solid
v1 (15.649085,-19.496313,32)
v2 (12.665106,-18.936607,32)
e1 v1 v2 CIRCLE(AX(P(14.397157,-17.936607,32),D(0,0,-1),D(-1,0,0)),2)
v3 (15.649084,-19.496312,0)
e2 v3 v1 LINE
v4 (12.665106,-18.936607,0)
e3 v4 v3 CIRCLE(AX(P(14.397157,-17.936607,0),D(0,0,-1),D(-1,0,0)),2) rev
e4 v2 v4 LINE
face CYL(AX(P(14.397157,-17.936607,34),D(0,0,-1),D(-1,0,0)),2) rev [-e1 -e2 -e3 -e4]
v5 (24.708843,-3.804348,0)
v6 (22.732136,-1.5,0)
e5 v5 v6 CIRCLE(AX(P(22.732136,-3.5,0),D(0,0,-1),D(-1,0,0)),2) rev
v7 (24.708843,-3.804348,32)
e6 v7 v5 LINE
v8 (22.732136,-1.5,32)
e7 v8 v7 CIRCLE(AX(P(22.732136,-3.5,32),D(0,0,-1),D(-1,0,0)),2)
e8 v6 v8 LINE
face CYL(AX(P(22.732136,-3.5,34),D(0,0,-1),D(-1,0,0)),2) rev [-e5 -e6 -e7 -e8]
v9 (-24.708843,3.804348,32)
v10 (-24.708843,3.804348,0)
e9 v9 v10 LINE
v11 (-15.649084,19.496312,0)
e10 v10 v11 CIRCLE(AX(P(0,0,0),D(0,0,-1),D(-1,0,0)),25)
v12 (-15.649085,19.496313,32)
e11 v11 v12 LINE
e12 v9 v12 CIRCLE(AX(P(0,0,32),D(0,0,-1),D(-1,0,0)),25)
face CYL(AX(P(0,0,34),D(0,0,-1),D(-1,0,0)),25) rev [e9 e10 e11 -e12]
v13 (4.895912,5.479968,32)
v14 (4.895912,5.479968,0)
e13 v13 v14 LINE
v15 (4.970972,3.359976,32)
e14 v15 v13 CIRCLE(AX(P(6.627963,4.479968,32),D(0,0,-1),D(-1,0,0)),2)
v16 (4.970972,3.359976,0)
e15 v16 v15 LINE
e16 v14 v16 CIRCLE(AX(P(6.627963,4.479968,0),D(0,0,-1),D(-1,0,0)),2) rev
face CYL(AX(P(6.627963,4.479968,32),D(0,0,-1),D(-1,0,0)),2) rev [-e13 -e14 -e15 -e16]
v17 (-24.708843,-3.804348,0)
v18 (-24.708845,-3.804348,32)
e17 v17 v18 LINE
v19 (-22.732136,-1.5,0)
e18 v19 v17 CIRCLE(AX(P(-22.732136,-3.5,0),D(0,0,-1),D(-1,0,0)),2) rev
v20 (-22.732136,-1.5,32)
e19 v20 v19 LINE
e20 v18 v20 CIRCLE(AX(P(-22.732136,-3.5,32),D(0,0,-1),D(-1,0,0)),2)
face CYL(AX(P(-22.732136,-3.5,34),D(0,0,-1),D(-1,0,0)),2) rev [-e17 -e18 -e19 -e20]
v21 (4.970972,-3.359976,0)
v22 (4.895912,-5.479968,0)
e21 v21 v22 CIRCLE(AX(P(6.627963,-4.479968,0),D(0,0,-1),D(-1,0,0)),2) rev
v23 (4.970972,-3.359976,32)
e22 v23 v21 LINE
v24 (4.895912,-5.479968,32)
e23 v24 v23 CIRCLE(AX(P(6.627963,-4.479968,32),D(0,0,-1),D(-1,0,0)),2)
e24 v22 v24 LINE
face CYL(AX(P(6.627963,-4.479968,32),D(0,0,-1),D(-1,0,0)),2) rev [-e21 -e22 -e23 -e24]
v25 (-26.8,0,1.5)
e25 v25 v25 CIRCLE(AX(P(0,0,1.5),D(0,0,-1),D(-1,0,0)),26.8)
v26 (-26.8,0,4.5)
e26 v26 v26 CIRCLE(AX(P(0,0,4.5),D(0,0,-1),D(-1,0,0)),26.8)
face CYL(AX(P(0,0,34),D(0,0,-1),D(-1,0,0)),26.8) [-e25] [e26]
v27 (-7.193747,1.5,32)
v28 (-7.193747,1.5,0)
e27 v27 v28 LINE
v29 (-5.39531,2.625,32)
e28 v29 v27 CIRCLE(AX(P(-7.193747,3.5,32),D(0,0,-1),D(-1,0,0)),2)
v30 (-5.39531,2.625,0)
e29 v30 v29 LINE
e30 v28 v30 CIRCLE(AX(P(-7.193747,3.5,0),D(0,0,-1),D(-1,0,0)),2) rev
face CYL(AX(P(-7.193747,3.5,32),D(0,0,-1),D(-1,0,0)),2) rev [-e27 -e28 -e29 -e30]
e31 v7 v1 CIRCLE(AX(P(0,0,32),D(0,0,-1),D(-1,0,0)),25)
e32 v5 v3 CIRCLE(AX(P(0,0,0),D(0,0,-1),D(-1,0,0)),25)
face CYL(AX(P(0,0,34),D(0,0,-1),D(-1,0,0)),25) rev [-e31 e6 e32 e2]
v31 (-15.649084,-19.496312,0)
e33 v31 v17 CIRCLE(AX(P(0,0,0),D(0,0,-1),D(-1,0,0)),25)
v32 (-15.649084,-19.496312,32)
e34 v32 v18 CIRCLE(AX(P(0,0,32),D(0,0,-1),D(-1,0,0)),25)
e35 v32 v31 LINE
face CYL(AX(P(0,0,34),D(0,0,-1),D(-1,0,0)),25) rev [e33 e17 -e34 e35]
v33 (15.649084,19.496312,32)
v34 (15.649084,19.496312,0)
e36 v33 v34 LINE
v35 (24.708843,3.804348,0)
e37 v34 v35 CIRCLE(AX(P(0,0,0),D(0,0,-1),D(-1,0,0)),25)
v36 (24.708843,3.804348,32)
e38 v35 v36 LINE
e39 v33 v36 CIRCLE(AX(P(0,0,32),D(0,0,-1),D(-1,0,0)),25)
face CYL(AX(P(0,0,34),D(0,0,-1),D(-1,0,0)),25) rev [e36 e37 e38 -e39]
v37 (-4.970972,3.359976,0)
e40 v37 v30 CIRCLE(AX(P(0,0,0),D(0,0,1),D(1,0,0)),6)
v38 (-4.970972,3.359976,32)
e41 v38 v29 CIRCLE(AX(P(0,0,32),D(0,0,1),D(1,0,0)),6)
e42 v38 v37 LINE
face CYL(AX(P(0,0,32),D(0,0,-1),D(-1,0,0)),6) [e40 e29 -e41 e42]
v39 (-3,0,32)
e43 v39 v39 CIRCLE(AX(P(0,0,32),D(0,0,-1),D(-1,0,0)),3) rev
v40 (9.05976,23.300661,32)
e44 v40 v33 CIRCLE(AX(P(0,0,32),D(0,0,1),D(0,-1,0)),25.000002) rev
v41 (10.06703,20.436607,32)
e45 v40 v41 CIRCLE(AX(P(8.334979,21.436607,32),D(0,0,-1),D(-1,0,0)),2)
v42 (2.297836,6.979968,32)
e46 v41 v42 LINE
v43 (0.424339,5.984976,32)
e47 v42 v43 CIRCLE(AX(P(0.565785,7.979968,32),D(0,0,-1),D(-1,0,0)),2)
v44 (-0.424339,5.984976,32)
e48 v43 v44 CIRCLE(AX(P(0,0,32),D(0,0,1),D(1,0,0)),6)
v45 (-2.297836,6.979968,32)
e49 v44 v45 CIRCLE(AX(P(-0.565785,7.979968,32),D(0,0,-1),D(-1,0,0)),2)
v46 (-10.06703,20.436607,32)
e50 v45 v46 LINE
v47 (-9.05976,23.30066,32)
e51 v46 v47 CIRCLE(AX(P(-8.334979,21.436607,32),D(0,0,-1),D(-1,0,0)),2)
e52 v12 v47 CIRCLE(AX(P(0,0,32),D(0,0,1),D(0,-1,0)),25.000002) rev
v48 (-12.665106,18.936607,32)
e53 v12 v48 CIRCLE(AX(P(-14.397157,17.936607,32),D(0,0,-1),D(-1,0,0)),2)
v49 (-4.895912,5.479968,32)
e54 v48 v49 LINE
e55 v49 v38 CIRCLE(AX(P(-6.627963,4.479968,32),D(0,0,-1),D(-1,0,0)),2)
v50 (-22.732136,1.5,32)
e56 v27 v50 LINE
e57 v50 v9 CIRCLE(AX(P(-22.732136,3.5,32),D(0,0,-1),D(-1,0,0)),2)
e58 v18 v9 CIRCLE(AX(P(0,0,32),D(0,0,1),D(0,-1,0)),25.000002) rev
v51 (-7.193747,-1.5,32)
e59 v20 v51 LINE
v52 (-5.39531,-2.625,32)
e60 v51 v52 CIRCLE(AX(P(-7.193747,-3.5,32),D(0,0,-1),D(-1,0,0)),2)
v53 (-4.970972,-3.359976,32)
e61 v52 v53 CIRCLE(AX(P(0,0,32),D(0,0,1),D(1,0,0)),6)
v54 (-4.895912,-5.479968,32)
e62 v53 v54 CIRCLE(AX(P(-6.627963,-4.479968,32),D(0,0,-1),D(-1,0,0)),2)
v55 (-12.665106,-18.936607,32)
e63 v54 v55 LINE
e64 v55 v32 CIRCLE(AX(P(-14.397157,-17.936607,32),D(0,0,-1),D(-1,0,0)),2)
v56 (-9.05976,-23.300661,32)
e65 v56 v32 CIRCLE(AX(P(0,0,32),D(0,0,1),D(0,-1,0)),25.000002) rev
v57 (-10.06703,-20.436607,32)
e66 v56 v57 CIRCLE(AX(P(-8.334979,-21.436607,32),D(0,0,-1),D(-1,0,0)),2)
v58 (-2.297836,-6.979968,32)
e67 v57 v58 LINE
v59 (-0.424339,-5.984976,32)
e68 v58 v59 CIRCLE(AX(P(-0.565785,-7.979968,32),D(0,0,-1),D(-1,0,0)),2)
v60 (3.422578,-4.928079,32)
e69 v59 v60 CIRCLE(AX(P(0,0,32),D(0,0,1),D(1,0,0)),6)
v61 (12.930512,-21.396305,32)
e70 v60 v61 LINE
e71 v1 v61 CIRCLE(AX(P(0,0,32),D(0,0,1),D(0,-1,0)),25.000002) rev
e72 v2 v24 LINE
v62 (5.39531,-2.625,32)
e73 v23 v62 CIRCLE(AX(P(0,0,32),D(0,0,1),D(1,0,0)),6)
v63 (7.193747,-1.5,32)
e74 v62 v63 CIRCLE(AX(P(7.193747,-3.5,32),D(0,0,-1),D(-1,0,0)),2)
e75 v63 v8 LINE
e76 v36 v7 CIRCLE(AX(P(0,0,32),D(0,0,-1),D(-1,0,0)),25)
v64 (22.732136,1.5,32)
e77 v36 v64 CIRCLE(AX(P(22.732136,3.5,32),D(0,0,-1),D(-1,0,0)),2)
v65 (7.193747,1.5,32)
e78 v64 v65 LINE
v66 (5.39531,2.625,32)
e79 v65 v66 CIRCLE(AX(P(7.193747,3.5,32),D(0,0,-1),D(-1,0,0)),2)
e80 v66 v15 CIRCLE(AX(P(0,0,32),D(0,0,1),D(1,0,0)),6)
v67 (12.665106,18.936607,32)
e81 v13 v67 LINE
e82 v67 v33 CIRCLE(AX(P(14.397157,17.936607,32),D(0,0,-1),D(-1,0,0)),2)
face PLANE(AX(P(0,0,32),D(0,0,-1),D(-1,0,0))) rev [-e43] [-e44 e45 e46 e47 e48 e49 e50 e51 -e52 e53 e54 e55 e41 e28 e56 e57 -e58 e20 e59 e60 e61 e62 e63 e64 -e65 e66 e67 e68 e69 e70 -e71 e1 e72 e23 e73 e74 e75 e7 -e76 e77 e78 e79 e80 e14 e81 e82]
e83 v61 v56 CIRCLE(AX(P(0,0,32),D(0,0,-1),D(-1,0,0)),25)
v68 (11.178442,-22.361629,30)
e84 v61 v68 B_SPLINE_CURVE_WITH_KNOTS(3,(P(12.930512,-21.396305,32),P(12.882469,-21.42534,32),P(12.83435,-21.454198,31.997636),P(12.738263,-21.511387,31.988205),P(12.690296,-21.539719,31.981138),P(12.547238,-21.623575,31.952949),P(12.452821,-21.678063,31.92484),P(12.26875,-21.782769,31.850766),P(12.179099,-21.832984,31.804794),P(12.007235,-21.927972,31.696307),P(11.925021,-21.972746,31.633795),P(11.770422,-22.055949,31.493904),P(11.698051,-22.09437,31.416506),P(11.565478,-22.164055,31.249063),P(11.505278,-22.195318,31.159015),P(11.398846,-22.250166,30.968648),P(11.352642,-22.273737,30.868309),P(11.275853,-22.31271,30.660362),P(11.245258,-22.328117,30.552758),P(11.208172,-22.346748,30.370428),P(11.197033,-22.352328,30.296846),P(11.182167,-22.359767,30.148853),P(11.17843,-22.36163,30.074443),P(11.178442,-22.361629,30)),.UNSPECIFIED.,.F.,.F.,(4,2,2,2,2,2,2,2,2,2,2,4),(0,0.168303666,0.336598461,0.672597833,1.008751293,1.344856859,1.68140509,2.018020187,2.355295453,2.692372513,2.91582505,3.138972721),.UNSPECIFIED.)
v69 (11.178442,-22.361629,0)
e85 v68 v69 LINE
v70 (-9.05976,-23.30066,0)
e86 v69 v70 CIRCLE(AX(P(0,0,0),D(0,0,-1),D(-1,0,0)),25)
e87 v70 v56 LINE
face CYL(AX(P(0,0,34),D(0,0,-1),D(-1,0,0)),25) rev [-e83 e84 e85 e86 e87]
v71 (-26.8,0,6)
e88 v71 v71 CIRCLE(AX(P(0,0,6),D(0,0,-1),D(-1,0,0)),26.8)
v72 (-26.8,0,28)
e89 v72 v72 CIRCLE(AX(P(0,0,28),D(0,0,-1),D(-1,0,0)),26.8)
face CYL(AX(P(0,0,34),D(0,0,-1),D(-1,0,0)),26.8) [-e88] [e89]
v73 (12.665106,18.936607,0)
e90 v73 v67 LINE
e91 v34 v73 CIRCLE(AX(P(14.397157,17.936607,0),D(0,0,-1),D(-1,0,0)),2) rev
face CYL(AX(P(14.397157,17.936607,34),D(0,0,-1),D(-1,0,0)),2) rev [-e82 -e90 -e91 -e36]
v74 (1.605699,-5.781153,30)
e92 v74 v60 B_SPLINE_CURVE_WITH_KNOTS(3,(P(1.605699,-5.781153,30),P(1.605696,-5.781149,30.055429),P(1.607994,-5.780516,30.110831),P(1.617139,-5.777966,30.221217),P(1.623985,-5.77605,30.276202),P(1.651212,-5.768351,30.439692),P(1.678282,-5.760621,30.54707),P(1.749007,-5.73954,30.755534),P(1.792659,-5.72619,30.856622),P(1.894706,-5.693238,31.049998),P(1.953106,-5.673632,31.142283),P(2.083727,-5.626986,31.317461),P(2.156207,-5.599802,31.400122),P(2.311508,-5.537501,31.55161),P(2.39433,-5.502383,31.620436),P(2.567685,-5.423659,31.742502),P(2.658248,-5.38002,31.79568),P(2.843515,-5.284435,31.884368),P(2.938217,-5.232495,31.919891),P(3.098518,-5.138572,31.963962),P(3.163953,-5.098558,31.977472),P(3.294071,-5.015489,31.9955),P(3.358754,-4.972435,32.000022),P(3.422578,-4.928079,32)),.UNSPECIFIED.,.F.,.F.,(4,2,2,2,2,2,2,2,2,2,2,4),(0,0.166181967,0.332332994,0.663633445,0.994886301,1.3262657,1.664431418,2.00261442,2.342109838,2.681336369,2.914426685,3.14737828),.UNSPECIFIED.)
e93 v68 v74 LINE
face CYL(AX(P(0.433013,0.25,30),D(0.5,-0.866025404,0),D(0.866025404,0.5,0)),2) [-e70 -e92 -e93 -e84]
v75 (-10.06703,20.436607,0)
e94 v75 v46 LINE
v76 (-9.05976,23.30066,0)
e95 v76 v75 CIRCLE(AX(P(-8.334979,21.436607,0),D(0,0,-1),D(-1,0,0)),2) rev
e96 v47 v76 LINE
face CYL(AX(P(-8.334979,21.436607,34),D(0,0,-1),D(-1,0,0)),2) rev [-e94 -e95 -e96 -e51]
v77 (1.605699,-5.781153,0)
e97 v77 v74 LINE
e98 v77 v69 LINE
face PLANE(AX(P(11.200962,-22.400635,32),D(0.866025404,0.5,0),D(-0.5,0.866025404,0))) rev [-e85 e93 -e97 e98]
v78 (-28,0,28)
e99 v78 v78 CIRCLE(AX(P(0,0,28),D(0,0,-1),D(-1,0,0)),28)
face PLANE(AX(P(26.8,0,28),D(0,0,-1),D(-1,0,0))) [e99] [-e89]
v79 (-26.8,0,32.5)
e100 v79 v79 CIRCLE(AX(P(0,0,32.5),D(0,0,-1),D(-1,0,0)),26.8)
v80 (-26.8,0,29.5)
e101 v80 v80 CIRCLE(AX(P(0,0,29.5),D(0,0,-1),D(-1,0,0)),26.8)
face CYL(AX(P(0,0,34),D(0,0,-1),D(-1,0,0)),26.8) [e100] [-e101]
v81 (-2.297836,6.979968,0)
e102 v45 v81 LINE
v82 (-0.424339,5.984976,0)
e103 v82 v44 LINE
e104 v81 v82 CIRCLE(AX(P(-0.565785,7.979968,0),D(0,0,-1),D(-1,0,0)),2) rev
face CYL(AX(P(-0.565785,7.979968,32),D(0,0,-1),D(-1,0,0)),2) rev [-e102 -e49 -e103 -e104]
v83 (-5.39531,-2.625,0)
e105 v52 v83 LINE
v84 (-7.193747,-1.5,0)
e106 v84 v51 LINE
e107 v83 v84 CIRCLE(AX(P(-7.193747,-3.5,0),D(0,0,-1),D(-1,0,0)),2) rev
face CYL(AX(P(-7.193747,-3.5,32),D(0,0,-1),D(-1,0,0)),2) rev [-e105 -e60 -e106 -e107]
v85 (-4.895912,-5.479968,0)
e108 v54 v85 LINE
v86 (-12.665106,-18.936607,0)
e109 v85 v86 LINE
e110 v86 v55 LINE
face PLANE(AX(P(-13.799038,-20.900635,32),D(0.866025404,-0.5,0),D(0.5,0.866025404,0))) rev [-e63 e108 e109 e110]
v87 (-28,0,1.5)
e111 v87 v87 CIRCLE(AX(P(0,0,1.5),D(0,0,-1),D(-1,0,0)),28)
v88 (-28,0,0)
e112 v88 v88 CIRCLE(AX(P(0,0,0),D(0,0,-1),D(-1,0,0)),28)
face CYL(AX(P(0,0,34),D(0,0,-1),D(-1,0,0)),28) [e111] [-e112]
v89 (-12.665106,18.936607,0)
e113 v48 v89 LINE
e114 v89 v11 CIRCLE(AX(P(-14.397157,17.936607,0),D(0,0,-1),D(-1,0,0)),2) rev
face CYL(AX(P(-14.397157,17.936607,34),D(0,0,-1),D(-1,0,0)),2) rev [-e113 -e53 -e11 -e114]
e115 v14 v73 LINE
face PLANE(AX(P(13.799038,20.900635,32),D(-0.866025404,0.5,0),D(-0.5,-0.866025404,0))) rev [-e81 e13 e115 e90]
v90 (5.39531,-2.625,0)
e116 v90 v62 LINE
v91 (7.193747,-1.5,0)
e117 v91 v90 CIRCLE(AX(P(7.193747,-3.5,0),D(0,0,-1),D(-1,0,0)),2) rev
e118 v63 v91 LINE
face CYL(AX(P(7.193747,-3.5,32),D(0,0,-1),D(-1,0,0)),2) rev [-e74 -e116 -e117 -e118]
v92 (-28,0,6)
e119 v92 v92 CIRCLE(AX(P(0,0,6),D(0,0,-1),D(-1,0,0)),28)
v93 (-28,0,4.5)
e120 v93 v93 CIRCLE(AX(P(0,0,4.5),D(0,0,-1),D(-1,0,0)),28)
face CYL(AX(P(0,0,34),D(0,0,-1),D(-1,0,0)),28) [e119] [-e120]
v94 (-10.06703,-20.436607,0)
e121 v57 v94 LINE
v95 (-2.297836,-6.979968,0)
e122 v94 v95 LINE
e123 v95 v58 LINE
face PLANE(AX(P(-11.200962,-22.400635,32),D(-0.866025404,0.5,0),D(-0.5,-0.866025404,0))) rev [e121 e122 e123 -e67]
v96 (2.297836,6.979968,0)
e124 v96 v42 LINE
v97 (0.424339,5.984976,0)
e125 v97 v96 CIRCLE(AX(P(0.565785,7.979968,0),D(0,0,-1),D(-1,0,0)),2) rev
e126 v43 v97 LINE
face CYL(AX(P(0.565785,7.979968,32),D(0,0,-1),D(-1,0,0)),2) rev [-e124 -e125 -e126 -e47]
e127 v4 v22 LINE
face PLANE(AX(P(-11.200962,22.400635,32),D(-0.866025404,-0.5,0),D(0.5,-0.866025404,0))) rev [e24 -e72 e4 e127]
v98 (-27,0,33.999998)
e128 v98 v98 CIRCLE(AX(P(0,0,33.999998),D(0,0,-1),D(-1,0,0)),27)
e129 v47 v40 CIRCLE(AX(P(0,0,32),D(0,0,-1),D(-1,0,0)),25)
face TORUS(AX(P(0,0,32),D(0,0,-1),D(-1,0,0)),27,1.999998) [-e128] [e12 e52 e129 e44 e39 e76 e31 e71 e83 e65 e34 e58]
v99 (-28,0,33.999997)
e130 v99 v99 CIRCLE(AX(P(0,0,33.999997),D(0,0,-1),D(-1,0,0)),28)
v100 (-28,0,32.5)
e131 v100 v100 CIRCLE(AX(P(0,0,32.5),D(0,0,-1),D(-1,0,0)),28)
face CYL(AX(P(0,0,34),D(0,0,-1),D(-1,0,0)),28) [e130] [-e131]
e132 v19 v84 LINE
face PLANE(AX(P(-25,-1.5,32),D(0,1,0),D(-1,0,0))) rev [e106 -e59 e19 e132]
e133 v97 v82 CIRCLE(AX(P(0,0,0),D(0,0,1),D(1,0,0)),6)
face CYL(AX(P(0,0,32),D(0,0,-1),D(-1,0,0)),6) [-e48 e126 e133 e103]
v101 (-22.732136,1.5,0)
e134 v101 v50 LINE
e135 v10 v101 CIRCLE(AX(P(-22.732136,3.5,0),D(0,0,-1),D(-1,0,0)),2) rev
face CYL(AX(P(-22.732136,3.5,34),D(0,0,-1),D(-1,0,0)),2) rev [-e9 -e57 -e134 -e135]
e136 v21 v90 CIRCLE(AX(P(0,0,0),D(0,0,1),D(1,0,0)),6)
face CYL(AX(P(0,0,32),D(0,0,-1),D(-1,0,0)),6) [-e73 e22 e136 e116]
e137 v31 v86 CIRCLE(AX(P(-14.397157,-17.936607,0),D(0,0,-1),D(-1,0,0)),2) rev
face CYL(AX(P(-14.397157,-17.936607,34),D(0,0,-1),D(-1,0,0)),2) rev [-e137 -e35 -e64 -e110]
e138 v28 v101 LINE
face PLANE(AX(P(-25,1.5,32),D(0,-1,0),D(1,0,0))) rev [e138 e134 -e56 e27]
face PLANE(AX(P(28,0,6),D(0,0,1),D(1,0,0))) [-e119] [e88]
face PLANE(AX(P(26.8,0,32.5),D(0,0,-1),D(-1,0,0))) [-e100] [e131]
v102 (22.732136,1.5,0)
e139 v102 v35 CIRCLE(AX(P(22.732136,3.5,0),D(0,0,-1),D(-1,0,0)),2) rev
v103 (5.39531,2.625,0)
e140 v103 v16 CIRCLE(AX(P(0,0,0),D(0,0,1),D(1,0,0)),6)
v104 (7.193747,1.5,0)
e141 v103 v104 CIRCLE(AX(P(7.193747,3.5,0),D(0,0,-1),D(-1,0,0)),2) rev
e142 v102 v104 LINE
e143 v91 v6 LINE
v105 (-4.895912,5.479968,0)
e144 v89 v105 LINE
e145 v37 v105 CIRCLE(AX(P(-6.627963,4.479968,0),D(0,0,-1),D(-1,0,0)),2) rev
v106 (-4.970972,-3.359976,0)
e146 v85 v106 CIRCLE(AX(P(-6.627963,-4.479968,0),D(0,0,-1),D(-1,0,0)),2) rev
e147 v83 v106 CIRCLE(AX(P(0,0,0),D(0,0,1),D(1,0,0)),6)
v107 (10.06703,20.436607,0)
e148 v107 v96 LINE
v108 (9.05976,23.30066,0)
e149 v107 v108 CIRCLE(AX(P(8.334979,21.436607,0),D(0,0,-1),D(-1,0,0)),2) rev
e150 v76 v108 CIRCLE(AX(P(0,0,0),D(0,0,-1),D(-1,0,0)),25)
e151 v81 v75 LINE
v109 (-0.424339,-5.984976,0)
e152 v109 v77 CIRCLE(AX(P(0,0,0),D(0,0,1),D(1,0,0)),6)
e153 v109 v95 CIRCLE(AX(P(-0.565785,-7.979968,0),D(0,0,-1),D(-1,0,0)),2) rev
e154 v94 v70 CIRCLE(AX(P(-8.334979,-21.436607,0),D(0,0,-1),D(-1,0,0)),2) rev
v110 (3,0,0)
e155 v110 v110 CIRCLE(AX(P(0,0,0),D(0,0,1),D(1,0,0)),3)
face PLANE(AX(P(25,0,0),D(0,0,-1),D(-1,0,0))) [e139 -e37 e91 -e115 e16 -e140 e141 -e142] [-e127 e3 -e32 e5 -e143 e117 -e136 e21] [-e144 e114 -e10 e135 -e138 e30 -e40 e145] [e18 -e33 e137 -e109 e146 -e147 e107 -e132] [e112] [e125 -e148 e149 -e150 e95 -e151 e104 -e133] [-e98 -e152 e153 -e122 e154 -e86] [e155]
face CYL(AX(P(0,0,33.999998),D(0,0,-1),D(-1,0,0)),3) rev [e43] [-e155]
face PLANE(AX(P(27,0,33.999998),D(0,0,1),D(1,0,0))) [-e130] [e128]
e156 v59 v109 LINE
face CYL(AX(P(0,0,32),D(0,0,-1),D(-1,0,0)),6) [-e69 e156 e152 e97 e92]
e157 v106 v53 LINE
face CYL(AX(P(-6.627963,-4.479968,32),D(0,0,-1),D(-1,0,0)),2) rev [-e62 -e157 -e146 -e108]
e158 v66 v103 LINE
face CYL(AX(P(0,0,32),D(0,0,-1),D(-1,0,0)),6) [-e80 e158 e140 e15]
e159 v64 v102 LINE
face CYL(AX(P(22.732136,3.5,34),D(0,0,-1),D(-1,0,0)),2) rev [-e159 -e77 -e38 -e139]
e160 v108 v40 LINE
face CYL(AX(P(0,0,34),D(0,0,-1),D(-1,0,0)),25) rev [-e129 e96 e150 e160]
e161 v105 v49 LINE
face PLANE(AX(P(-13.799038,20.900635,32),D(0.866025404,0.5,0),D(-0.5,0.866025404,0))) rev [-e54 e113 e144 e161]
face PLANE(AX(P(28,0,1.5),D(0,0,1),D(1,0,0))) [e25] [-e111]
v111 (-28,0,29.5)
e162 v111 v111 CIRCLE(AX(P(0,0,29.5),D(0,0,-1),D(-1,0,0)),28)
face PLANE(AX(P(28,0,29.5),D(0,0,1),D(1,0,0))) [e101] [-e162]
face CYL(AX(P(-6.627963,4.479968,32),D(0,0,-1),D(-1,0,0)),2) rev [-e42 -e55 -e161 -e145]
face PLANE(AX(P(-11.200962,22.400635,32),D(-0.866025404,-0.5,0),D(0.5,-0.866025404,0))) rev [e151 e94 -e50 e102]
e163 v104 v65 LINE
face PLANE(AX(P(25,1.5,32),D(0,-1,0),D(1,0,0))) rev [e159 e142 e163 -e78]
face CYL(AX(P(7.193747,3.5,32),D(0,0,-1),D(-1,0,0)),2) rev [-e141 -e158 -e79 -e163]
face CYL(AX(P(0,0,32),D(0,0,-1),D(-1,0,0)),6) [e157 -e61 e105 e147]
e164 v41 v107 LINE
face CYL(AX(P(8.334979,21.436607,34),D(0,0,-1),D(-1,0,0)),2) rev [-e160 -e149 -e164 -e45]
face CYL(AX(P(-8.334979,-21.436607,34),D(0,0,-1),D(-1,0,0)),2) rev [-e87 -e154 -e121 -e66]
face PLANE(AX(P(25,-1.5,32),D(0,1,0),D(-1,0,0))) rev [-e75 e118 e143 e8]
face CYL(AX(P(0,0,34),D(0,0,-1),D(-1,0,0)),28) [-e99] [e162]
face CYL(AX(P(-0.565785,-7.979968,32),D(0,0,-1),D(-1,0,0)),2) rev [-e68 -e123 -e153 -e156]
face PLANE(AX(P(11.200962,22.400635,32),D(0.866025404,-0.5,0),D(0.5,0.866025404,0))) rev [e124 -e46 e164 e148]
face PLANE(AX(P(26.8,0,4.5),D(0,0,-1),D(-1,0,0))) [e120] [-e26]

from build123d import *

# Parameters (mm, degrees)
SKETCH2_W           = 25
SKETCH2_H           = 3
BOSS_EXTRUDE1_DEPTH = 32
CIRPATTERN1_COUNT   = 6
SKETCH5_R           = 6
BOSS_EXTRUDE2_DEPTH = 32
SKETCH6_R           = 3
AXLEHOLE_DEPTH      = 53.191951405
FILLET1_R           = 2


with BuildPart() as part:
    # Sketch1 → Revolve1 (revolve)
    with BuildSketch(Plane.XZ, mode=Mode.PRIVATE) as revolve1_sk:
        with BuildLine():
            Line((25, 0), (28, 0))
            Line((28, 0), (28, 1.5))
            Line((28, 1.5), (26.8, 1.5))
            Line((26.8, 1.5), (26.8, 4.5))
            Line((26.8, 4.5), (28, 4.5))
            Line((28, 4.5), (28, 6))
            Line((28, 6), (26.8, 6))
            Line((26.8, 6), (26.8, 28))
            Line((26.8, 28), (28, 28))
            Line((28, 28), (28, 29.5))
            Line((28, 29.5), (26.8, 29.5))
            Line((26.8, 29.5), (26.8, 32.5))
            Line((26.8, 32.5), (28, 32.5))
            Line((28, 32.5), (28, 33.999996833))
            Line((28, 33.999996833), (27, 33.999996833))
            ThreePointArc((27, 33.999996833), (25.585786438, 33.414213562), (25, 32))
            Line((25, 32), (25, 0))
        make_face()
    revolve(revolve1_sk.sketch.rotate(Axis((0, 0, 34), (0, 0, -1)), 180), axis=Axis((0, 0, 34), (0, 0, -1)))

    # Sketch2 → Boss-Extrude1 (add)
    with BuildSketch(Plane.XY):
        with Locations((12.5, 0)):
            Rectangle(SKETCH2_W, SKETCH2_H)
    boss_extrude1 = extrude(amount=BOSS_EXTRUDE1_DEPTH)

    # CirPattern1: Boss-Extrude1 ×6 about axis
    cirpattern1_axis = Axis((0, 0, 0), (0, 0, 1))
    for i in range(1, CIRPATTERN1_COUNT):
        add(boss_extrude1.rotate(cirpattern1_axis, i * 360 / CIRPATTERN1_COUNT))

    # Sketch5 → Boss-Extrude2 (add)
    with BuildSketch(Plane.XY):
        Circle(SKETCH5_R)
    extrude(amount=BOSS_EXTRUDE2_DEPTH)

    # Sketch6 → AxleHole (cut, through all)
    with BuildSketch(Plane.XY):
        with Locations(Location((0, 0, 0), (0, 0, 180))):
            Circle(SKETCH6_R)
    extrude(amount=AXLEHOLE_DEPTH, mode=Mode.SUBTRACT)

    # Fillet1
    # the kernel refuses this fillet: 2 mm, written as the material it adds along each edge
    with BuildSketch(Plane(origin=(-24.954959427, -1.5, 32), x_dir=(0.10620109039764976, -0.9943446728365121, 0), z_dir=(0, 0, -1))) as fillet1_piece_1:
        with BuildLine():
            CenterArc((2.224755634, -1.997850608), FILLET1_R, 87.343441845, 98.752929077)
            Line((0.236066288, -2.210252789), (0, 0))
            ThreePointArc((0, 0), (1.158726893, 0.026867397), (2.317453785, 0))
        make_face()
    extrude(amount=32)
    with BuildSketch(Plane(origin=(-13.776517819, -20.861628814, 32), x_dir=(-0.8080272015953212, 0.589145178612228, 0), z_dir=(0, 0, -1)), Plane(origin=(13.776517819, 20.861628814, 32), x_dir=(0.8080272015953204, -0.589145178612229, 0), z_dir=(0, 0, -1)), Plane(origin=(24.954959427, -1.5, 32), x_dir=(-0.10620109039765001, -0.994344672836512, 0), z_dir=(0, 0, -1)), Plane(origin=(-11.178441608, 22.361628814, 32), x_dir=(0.9142282919929711, 0.4051994942242834, 0), z_dir=(0, 0, -1)), Plane(origin=(-24.954959427, 1.5, 32), x_dir=(0.10620109039765026, 0.994344672836512, 0), z_dir=(0, 0, -1))) as fillet1_piece_2:
        with BuildLine():
            CenterArc((2.224755634, 1.997850608), FILLET1_R, 173.903629078, 98.752929077)
            Line((0.236066288, 2.210252789), (0, 0))
            ThreePointArc((0, 0), (1.158726893, -0.026867397), (2.317453785, 0))
        make_face()
    extrude(amount=32)
    with BuildSketch(Plane(origin=(-11.178441608, -22.361628814, 32), x_dir=(0.5000000000000002, 0.8660254037844387, 0), z_dir=(0, 0, -1)), Plane(origin=(13.776517819, -20.861628814, 32), x_dir=(-0.5000000000000002, 0.8660254037844387, 0), z_dir=(0, 0, -1)), Plane(origin=(24.954959427, 1.5, 32), x_dir=(-1, 0, 0), z_dir=(0, 0, -1)), Plane(origin=(11.178441608, 22.361628814, 32), x_dir=(-0.4999999999999994, -0.8660254037844389, 0), z_dir=(0, 0, -1)), Plane(origin=(-13.776517819, 20.861628814, 32), x_dir=(0.5000000000000007, -0.8660254037844382, 0), z_dir=(0, 0, -1))) as fillet1_piece_3:
        with BuildLine():
            CenterArc((2.222823584, 2), FILLET1_R, 171.247070923, 98.752929077)
            ThreePointArc((0.246116119, 2.304347826), (0.096342606, 1.15502726), (0, 0))
            Line((0, 0), (2.222823584, 0))
        make_face()
    extrude(amount=32)
    with BuildSketch(Plane(origin=(5.809475019, 1.5, 32), x_dir=(1, 0, 0), z_dir=(0, 0, -1)), Plane(origin=(4.203775615, -4.281152949, 32), x_dir=(0.5000000000000001, -0.8660254037844386, 0), z_dir=(0, 0, -1)), Plane(origin=(1.605699404, 5.781152949, 32), x_dir=(0.4999999999999986, 0.8660254037844394, 0), z_dir=(0, 0, -1)), Plane(origin=(-4.203775615, 4.281152949, 32), x_dir=(-0.5000000000000004, 0.8660254037844384, 0), z_dir=(0, 0, -1)), Plane(origin=(-5.809475019, -1.5, 32), x_dir=(-1, 0, 0), z_dir=(0, 0, -1)), Plane(origin=(-1.605699404, -5.781152949, 32), x_dir=(-0.4999999999999988, -0.8660254037844393, 0), z_dir=(0, 0, -1))) as fillet1_piece_4:
        with BuildLine():
            CenterArc((1.384272266, -2), FILLET1_R, 90, 64.055520228)
            ThreePointArc((-0.414164556, -1.125), (-0.178914596, -0.572869827), (0, 0))
            Line((0, 0), (1.384272266, 0))
        make_face()
    extrude(amount=32)
    with BuildSketch(Plane(origin=(4.203775615, 4.281152949, 32), x_dir=(0.6399622417657335, -0.7684063567632539, 0), z_dir=(0, 0, -1)), Plane(origin=(5.809475019, -1.5, 32), x_dir=(-0.3454783045035584, -0.9384267372135913, 0), z_dir=(0, 0, -1)), Plane(origin=(-1.605699404, 5.781152949, 32), x_dir=(0.9854405462692932, 0.1700203804503366, 0), z_dir=(0, 0, -1)), Plane(origin=(-5.809475019, 1.5, 32), x_dir=(0.3454783045035597, 0.9384267372135907, 0), z_dir=(0, 0, -1))) as fillet1_piece_5:
        with BuildLine():
            CenterArc((1.398617439, -1.989994715), FILLET1_R, 95.733483793, 64.055520228)
            Line((-0.478236035, -1.299038106), (0, 0))
            ThreePointArc((0, 0), (0.599407474, -0.030015856), (1.198814948, 0))
        make_face()
    extrude(amount=32)
    with BuildSketch(Plane(origin=(-4.203775615, -4.281152949, 32), x_dir=(-0.4999999999999996, -0.8660254037844388, 0), z_dir=(0, 0, -1))) as fillet1_piece_6:
        with BuildLine():
            CenterArc((1.384272266, 2), FILLET1_R, 205.944479772, 64.055520228)
            ThreePointArc((-0.414164556, 1.125), (-0.178914596, 0.572869827), (0, 0))
            Line((0, 0), (1.384272266, 0))
        make_face()
    extrude(amount=32)
    # the kernel refuses this fillet: 2 mm, written as the material it takes off along each edge
    with BuildSketch(Plane(origin=(-0.894300596, -1.45102593, 32), x_dir=(0.8660254037844385, 0.5000000000000003, 0), z_dir=(0.5000000000000003, -0.8660254037844386, 0))) as fillet1_2_piece_1_section:
        with BuildLine():
            CenterArc((FILLET1_R, -FILLET1_R), FILLET1_R, 90, 90)
            Line((0, -FILLET1_R), (0, 0))
            Line((0, 0), (FILLET1_R, 0))
        make_face()
    fillet1_2_piece_1 = extrude(amount=29.145484408, mode=Mode.PRIVATE)
    fillet1_2_piece_1 = fillet1_2_piece_1 & Plane(origin=(0, 0, 31.552739603), x_dir=(-1, 0, 0), z_dir=(0, 0, -1)) * Cylinder(25, 67, mode=Mode.PRIVATE)
    fillet1_2_piece_1 = fillet1_2_piece_1 - Plane(origin=(0, 0, 31.552739603), x_dir=(1, 0, 0), z_dir=(0, 0, -1)) * Cylinder(6, 67, mode=Mode.PRIVATE)
    add(fillet1_2_piece_1, mode=Mode.SUBTRACT)


solid = part.part
